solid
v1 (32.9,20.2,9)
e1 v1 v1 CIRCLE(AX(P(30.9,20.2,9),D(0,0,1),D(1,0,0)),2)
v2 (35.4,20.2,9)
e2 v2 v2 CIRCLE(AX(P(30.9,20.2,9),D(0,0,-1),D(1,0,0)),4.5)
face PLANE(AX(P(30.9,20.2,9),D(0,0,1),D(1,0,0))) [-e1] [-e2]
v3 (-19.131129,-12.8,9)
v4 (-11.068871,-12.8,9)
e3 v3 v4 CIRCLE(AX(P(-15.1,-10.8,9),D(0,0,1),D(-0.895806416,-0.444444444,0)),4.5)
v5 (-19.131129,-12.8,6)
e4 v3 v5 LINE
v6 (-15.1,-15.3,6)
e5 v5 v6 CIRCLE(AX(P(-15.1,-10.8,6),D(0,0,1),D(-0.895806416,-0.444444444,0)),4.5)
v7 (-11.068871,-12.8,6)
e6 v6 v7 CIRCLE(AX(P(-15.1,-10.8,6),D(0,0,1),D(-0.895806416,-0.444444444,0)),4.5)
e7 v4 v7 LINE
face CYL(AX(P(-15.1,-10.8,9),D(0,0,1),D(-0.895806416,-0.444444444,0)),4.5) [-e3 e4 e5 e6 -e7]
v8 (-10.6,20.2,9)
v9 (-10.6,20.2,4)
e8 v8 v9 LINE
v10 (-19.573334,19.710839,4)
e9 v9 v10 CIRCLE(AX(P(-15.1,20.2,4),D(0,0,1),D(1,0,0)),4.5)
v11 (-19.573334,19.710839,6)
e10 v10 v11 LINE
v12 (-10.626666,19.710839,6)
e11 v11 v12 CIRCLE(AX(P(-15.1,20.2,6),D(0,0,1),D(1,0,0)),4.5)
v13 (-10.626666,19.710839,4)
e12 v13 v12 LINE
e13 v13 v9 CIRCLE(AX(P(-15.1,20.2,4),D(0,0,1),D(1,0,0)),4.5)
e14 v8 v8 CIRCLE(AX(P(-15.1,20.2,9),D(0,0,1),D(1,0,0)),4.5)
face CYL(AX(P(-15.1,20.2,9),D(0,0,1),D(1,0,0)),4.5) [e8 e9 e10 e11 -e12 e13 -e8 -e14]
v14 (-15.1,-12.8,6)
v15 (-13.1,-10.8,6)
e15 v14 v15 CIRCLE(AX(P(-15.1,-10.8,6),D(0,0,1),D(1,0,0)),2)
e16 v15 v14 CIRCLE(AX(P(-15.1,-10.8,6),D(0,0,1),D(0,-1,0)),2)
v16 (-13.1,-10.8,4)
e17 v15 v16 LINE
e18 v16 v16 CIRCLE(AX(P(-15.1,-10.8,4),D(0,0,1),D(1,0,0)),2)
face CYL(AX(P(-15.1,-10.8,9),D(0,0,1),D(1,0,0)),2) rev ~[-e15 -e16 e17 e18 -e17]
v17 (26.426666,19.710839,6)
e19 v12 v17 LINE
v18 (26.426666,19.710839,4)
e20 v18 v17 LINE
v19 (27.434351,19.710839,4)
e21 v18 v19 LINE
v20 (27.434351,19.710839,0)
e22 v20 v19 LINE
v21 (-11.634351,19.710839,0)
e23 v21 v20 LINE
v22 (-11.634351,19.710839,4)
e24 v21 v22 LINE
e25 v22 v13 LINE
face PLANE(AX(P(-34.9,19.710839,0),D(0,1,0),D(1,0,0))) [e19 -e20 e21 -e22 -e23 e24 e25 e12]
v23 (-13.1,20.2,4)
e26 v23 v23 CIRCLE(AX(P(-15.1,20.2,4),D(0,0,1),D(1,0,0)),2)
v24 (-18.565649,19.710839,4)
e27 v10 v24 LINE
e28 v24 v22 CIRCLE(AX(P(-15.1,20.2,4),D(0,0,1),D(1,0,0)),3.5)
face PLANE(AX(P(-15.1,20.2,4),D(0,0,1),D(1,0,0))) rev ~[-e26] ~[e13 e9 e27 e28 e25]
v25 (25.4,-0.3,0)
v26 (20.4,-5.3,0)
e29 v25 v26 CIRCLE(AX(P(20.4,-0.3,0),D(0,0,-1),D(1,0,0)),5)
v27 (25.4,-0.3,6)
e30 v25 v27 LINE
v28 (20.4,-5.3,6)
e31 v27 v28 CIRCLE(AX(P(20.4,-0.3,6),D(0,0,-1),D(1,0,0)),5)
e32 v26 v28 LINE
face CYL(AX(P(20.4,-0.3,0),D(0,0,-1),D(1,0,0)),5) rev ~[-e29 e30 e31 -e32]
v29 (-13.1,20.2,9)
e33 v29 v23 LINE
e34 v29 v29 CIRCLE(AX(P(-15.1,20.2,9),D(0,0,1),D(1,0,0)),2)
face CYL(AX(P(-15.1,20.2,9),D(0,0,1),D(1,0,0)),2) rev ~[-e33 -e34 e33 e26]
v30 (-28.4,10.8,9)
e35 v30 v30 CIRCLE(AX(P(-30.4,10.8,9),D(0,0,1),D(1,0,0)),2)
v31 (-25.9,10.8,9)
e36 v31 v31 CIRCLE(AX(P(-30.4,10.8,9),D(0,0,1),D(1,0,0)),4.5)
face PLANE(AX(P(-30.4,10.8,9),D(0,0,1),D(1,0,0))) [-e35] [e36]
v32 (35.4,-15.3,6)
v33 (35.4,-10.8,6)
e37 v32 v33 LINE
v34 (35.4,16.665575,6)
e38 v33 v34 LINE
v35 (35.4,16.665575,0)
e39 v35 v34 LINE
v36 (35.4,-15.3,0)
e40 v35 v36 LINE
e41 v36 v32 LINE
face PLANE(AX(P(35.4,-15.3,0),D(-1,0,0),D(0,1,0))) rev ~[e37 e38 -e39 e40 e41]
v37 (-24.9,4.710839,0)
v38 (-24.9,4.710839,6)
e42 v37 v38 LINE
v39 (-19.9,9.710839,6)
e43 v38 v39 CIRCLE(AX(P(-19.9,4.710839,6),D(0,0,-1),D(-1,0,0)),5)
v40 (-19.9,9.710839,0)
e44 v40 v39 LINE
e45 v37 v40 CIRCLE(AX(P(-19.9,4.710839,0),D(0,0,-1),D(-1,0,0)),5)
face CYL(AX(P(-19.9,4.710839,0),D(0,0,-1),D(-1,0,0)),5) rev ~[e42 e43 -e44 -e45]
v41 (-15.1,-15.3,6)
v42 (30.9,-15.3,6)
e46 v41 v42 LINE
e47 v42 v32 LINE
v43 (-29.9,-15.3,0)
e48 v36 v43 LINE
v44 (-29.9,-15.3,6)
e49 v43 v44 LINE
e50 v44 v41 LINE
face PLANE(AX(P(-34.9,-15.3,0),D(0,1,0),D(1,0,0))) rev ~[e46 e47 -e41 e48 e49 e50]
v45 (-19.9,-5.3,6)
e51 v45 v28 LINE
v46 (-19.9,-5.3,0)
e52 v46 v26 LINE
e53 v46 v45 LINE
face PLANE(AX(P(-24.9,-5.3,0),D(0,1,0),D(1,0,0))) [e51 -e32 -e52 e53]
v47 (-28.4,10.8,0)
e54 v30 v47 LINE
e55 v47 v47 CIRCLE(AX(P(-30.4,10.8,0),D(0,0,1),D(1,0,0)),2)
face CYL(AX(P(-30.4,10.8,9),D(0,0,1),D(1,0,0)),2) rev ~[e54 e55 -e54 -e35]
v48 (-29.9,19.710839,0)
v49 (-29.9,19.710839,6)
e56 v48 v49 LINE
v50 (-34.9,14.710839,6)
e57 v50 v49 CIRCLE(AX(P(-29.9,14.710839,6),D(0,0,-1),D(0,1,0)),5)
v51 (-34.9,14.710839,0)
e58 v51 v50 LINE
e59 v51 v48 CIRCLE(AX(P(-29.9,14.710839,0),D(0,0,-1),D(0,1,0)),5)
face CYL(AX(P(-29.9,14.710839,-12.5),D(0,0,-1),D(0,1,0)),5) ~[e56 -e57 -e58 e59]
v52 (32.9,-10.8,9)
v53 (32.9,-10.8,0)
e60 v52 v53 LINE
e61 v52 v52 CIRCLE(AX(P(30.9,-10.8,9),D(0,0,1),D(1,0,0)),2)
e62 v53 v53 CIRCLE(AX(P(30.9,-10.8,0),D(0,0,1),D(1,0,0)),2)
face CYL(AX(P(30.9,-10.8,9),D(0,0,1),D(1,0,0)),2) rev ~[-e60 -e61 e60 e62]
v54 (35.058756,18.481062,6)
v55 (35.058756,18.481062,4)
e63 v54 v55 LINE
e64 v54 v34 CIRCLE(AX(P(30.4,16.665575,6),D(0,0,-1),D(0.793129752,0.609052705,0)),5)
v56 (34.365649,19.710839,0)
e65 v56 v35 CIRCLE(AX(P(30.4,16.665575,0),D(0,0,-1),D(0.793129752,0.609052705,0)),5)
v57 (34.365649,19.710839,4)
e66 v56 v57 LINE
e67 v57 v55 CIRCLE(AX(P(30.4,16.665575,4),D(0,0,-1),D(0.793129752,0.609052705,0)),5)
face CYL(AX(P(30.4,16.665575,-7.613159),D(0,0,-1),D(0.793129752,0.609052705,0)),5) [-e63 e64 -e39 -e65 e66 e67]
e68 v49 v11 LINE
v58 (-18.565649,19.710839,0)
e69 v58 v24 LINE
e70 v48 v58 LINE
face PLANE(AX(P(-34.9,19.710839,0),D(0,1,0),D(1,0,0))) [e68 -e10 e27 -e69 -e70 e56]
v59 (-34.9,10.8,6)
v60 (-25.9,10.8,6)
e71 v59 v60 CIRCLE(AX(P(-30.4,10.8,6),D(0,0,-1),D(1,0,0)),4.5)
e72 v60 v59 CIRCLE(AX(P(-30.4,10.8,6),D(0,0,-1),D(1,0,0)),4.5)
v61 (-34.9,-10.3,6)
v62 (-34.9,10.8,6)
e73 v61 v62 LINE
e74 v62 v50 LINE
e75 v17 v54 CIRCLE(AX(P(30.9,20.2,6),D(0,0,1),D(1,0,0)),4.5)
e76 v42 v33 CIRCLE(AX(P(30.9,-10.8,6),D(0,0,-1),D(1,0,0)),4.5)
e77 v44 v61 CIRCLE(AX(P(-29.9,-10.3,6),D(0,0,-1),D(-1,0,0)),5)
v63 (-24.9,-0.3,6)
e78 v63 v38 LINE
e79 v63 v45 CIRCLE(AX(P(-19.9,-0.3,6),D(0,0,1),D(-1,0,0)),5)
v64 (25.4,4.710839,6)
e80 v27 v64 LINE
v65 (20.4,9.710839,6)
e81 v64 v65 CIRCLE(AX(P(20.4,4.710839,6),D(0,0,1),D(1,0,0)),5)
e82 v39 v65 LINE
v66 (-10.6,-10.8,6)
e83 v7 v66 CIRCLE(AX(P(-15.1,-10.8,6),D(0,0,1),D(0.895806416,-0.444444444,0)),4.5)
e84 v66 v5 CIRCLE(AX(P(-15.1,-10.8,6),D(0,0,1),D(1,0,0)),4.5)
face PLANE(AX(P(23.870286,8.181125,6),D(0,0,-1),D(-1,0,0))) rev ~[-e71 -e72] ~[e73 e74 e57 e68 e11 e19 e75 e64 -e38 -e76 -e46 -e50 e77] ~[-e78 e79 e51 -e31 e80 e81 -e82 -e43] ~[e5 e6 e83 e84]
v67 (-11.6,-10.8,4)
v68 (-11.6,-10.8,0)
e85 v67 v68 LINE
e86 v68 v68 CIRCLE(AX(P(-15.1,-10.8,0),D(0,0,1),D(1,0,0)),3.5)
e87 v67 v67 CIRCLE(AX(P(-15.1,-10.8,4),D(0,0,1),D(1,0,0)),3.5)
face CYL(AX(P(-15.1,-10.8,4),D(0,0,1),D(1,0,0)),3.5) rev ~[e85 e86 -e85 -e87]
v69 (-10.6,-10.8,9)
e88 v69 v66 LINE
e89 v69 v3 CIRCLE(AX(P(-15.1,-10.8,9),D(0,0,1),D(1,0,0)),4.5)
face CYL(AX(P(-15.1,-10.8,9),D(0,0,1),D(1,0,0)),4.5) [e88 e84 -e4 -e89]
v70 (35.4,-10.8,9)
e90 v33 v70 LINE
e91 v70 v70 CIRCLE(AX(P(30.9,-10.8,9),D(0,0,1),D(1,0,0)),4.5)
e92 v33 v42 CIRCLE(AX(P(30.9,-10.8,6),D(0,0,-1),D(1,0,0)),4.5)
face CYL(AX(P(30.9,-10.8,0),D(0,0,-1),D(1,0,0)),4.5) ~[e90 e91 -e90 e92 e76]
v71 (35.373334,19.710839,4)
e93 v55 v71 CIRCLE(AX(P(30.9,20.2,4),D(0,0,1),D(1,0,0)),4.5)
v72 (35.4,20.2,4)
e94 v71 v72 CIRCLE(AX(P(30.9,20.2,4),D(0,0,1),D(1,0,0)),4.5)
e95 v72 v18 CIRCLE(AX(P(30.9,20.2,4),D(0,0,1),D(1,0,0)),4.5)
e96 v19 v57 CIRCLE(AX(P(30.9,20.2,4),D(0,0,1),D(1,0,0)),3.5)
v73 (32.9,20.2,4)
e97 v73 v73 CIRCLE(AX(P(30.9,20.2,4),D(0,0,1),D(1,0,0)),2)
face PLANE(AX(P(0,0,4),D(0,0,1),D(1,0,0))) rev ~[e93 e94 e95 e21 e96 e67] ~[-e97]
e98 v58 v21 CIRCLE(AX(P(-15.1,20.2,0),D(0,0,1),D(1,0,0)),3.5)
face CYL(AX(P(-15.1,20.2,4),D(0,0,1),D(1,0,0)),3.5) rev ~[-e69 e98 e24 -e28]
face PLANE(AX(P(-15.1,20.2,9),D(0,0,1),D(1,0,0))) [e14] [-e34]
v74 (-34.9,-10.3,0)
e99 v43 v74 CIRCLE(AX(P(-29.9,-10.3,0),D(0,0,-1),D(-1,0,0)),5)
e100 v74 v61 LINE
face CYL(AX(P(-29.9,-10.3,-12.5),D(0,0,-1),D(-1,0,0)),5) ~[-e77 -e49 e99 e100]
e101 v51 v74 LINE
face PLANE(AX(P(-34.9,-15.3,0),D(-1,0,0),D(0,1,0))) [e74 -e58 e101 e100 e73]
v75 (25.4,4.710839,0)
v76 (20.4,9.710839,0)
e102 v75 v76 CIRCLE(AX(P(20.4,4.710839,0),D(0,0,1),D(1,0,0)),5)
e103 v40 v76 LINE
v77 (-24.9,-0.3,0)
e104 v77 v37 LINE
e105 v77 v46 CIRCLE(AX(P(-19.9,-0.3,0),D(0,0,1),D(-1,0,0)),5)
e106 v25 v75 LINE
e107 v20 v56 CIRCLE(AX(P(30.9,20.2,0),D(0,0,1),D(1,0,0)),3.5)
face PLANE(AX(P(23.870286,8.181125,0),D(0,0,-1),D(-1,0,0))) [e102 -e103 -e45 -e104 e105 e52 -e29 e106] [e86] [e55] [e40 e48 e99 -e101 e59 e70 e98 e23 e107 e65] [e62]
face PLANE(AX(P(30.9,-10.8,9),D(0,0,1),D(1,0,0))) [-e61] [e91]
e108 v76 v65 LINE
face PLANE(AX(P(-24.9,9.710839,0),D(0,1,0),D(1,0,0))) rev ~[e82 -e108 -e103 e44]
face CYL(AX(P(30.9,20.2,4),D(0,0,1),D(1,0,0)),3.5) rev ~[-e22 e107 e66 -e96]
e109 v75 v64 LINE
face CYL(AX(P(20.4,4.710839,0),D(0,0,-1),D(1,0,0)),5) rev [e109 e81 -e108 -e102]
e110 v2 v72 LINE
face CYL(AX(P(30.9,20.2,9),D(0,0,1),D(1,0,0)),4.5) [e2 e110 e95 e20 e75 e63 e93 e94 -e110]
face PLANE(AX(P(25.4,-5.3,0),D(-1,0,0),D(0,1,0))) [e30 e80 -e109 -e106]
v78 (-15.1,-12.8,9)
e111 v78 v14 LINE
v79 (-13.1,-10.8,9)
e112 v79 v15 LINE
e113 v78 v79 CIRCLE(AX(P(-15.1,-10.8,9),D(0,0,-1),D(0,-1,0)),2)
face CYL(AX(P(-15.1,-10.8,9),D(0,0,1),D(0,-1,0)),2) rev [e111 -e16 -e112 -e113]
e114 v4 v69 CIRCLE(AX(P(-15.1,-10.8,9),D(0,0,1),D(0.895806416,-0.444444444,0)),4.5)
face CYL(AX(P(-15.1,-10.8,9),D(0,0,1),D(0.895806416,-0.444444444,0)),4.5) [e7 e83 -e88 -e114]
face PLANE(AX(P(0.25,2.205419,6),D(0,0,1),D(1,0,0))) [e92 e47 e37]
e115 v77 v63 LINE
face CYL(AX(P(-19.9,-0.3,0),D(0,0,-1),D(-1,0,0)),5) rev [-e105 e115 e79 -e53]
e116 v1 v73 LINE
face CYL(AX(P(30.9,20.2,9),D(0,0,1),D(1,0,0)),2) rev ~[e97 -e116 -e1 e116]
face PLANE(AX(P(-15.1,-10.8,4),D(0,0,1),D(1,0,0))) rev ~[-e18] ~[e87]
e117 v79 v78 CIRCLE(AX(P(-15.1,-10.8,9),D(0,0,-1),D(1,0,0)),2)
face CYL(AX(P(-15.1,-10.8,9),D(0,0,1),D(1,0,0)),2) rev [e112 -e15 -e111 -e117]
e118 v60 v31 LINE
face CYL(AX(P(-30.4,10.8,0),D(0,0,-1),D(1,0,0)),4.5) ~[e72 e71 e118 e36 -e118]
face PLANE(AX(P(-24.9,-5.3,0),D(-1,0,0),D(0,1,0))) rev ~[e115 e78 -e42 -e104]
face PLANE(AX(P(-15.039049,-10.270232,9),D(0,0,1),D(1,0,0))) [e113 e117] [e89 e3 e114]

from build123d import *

# Parameters (mm, degrees)
F4_R          = 4.5
F4_R_2        = 2
F5_DEPTH      = 9
F6_W          = 70.3
F6_H          = 35.0108387947
F6_W_2        = 50.3
F6_H_2        = 15.0108387947
F7_DEPTH      = 6
F8_R          = 4.5
F8_R_2        = 2
F9_DEPTH      = 5
F10_R         = 2
F11_DEPTH     = 9.001
F13_START     = -5
F12_R         = 3.5
F12_R_2       = 2
F13_DEPTH     = 23
F14_R         = 2
F15_DEPTH     = 9.001
F16_T1_DEPTH  = 6
F16_T3_DEPTH  = 6
F16_T5_DEPTH  = 6
F16_T7_DEPTH  = 6
F16_T9_DEPTH  = 31
F16_T14_DEPTH = 21.2263176167
F16_T19_DEPTH = 21.2263176167
F16_S20_R     = 4.5
F16_T21_DEPTH = 12
F16_T22_DEPTH = 31


# Not quite as in the source:
# - a fillet or chamfer that OpenCascade refuses, or shapes differently, is made with other operations: its cross-section is extruded or revolved along the edge and cut away or added
# - after a boolean that leaves OpenCascade's solid faulty, fix() repairs it


with BuildPart() as f5:
    # F4 (on Top) → F5 (new body)
    with BuildSketch(Plane.XY):
        with Locations((-30.4, 10.8)):
            Circle(F4_R)
        with Locations((-30.4, 10.8)):
            Circle(F4_R_2, mode=Mode.SUBTRACT)
    extrude(amount=F5_DEPTH)



with BuildPart() as f5b:
    # F4 (on Top) → F5, piece 2 (new body)
    with BuildSketch(Plane.XY):
        with Locations((30.9, -10.8)):
            Circle(F4_R)
        with Locations((30.9, -10.8)):
            Circle(F4_R_2, mode=Mode.SUBTRACT)
    extrude(amount=F5_DEPTH)


with BuildPart() as f5_1:
    add(f5.part)

    add(f5b.part)  # F7 merges F5b
    # F6 (on face) → F7 (join)
    with BuildSketch(Plane.XY):
        with Locations((0.25, 2.2054193974)):
            Rectangle(F6_W, F6_H)
        with Locations((0.25, 2.2054193974)):
            Rectangle(F6_W_2, F6_H_2, mode=Mode.SUBTRACT)
    extrude(amount=F7_DEPTH)

    # F8 (on face) → F9 (join)
    with BuildSketch(Plane.XY.offset(9)):
        with BuildLine():
            Line((-19.1311288741, -12.8), (-15.1, -12.8))
            Line((-15.1, -12.8), (-11.0688711259, -12.8))
            ThreePointArc((-11.0688711259, -12.8), (-10.7187855603, -11.8271124735), (-10.6, -10.8))
            ThreePointArc((-10.6, -10.8), (-16.1271124735, -6.4187855603), (-19.1311288741, -12.8))
        make_face()
        with BuildLine():
            ThreePointArc((-15.1, -12.8), (-16.5142135624, -9.3857864376), (-13.1, -10.8))
            ThreePointArc((-13.1, -10.8), (-13.6857864376, -12.2142135624), (-15.1, -12.8))
        make_face(mode=Mode.SUBTRACT)
        with BuildLine():
            Line((-11.0688711259, -12.8), (-15.1, -12.8))
            Line((-15.1, -12.8), (-19.1311288741, -12.8))
            ThreePointArc((-19.1311288741, -12.8), (-15.1, -15.3), (-11.0688711259, -12.8))
        make_face()
        with Locations((-15.1, 20.2)):
            Circle(F8_R)
        with Locations((-15.1, 20.2)):
            Circle(F8_R_2, mode=Mode.SUBTRACT)
        with Locations((30.9, 20.2)):
            Circle(F8_R)
        with Locations((30.9, 20.2)):
            Circle(F8_R_2, mode=Mode.SUBTRACT)
    extrude(amount=-F9_DEPTH)

    # F10 (on face) → F11 (cut, through all)
    with BuildSketch(Plane.XY.offset(9)):
        with Locations((30.9, -10.8)):
            Circle(F10_R)
        with Locations((-30.4, 10.8)):
            Circle(F10_R)
    extrude(amount=-F11_DEPTH, mode=Mode.SUBTRACT)

    # F12 (on face) → F13 (cut)
    with BuildSketch(Plane.XY.offset(9).offset(F13_START)):
        with Locations((-15.1, 20.2)):
            Circle(F12_R)
        with Locations((-15.1, 20.2)):
            Circle(F12_R_2, mode=Mode.SUBTRACT)
        with Locations((30.9, 20.2)):
            Circle(F12_R)
        with Locations((30.9, 20.2)):
            Circle(F12_R_2, mode=Mode.SUBTRACT)
        with Locations((-15.1, -10.8)):
            Circle(F12_R)
        with Locations((-15.1, -10.8)):
            Circle(F12_R_2, mode=Mode.SUBTRACT)
    extrude(amount=-F13_DEPTH, mode=Mode.SUBTRACT)

    # F14 (on face) → F15 (cut, through all)
    with BuildSketch(Plane.XY.offset(9)):
        with Locations((-15.1, 20.2)):
            Circle(F14_R)
        with Locations((30.9, 20.2)):
            Circle(F14_R)
        with Locations((-15.1, -10.8)):
            Circle(F14_R)
        with Locations((30.9, -10.8)):
            Circle(F14_R)
    extrude(amount=-F15_DEPTH, mode=Mode.SUBTRACT)

    add(f5_1.part.fix(), mode=Mode.REPLACE)

    # F16: fillet of radius 5 on 7 edges, made by hand

    # F16_s2 → F16_t1 (join)
    with BuildSketch(Plane.XY):
        with BuildLine():
            ThreePointArc((-24.9, -0.3), (-23.4355339059, -3.8355339059), (-19.9, -5.3))
            Line((-19.9, -5.3), (-24.9, -5.3))
            Line((-24.9, -5.3), (-24.9, -0.3))
        make_face()
    extrude(amount=F16_T1_DEPTH)

    # F16_s4 → F16_t3 (join)
    with BuildSketch(Plane.XY):
        with BuildLine():
            ThreePointArc((-24.9, 4.7108387947), (-23.4355339059, 8.2463727006), (-19.9, 9.7108387947))
            Line((-19.9, 9.7108387947), (-24.9, 9.7108387947))
            Line((-24.9, 9.7108387947), (-24.9, 4.7108387947))
        make_face()
    extrude(amount=F16_T3_DEPTH)

    # F16_s6 → F16_t5 (join)
    with BuildSketch(Plane.XY):
        with BuildLine():
            ThreePointArc((25.4, -0.3), (23.9355339059, -3.8355339059), (20.4, -5.3))
            Line((20.4, -5.3), (25.4, -5.3))
            Line((25.4, -5.3), (25.4, -0.3))
        make_face()
    extrude(amount=F16_T5_DEPTH)

    # F16_s8 → F16_t7 (join)
    with BuildSketch(Plane.XY):
        with BuildLine():
            ThreePointArc((25.4, 4.7108387947), (23.9355339059, 8.2463727006), (20.4, 9.7108387947))
            Line((20.4, 9.7108387947), (25.4, 9.7108387947))
            Line((25.4, 9.7108387947), (25.4, 4.7108387947))
        make_face()
    extrude(amount=F16_T7_DEPTH)

    # F16_s10 → F16_t9 (cut)
    with BuildSketch(Plane.XY.offset(-12.5)):
        with BuildLine():
            ThreePointArc((-34.9, -10.3), (-33.4355339059, -13.8355339059), (-29.9, -15.3))
            Line((-29.9, -15.3), (-34.9, -15.3))
            Line((-34.9, -15.3), (-34.9, -10.3))
        make_face()
    extrude(amount=F16_T9_DEPTH, mode=Mode.SUBTRACT)


with BuildPart() as f16_tool12:
    # F16_s13 → F16_t14 (new body)
    with BuildSketch(Plane.XY.offset(-7.6131588083)):
        with BuildLine():
            ThreePointArc((34.3656487582, 19.7108387947), (35.1343554889, 18.2736418448), (35.4, 16.6655752714))
            Line((35.4, 16.6655752714), (35.4, 19.7108387947))
            Line((35.4, 19.7108387947), (34.3656487582, 19.7108387947))
        make_face()
    extrude(amount=F16_T14_DEPTH)

    split(bisect_by=Plane.XY.offset(4), keep=Keep.BOTTOM)


with BuildPart() as f5_2:
    add(f5_1.part)

    # F16_t11: cut F16_tool12
    add(f16_tool12.part, mode=Mode.SUBTRACT)


with BuildPart() as f16_tool17:
    # F16_s18 → F16_t19 (new body)
    with BuildSketch(Plane.XY.offset(-7.6131588083)):
        with BuildLine():
            ThreePointArc((34.3656487582, 19.7108387947), (35.1343554889, 18.2736418448), (35.4, 16.6655752714))
            Line((35.4, 16.6655752714), (35.4, 19.7108387947))
            Line((35.4, 19.7108387947), (34.3656487582, 19.7108387947))
        make_face()
    extrude(amount=F16_T19_DEPTH)

    # F16_s20 → F16_t21 (cut, symmetric)
    with BuildSketch(Plane.XY.offset(3)):
        with Locations((30.9, 20.2)):
            Circle(F16_S20_R)
    extrude(amount=F16_T21_DEPTH, both=True, mode=Mode.SUBTRACT)


with BuildPart() as f5_3:
    add(f5_2.part)

    # F16_t16: cut F16_tool17
    add(f16_tool17.part, mode=Mode.SUBTRACT)

    # F16_s23 → F16_t22 (cut)
    with BuildSketch(Plane.XY.offset(-12.5)):
        with BuildLine():
            ThreePointArc((-29.9, 19.7108387947), (-33.4355339059, 18.2463727006), (-34.9, 14.7108387947))
            Line((-34.9, 14.7108387947), (-34.9, 19.7108387947))
            Line((-34.9, 19.7108387947), (-29.9, 19.7108387947))
        make_face()
    extrude(amount=F16_T22_DEPTH, mode=Mode.SUBTRACT)


solid = f5_3.part
